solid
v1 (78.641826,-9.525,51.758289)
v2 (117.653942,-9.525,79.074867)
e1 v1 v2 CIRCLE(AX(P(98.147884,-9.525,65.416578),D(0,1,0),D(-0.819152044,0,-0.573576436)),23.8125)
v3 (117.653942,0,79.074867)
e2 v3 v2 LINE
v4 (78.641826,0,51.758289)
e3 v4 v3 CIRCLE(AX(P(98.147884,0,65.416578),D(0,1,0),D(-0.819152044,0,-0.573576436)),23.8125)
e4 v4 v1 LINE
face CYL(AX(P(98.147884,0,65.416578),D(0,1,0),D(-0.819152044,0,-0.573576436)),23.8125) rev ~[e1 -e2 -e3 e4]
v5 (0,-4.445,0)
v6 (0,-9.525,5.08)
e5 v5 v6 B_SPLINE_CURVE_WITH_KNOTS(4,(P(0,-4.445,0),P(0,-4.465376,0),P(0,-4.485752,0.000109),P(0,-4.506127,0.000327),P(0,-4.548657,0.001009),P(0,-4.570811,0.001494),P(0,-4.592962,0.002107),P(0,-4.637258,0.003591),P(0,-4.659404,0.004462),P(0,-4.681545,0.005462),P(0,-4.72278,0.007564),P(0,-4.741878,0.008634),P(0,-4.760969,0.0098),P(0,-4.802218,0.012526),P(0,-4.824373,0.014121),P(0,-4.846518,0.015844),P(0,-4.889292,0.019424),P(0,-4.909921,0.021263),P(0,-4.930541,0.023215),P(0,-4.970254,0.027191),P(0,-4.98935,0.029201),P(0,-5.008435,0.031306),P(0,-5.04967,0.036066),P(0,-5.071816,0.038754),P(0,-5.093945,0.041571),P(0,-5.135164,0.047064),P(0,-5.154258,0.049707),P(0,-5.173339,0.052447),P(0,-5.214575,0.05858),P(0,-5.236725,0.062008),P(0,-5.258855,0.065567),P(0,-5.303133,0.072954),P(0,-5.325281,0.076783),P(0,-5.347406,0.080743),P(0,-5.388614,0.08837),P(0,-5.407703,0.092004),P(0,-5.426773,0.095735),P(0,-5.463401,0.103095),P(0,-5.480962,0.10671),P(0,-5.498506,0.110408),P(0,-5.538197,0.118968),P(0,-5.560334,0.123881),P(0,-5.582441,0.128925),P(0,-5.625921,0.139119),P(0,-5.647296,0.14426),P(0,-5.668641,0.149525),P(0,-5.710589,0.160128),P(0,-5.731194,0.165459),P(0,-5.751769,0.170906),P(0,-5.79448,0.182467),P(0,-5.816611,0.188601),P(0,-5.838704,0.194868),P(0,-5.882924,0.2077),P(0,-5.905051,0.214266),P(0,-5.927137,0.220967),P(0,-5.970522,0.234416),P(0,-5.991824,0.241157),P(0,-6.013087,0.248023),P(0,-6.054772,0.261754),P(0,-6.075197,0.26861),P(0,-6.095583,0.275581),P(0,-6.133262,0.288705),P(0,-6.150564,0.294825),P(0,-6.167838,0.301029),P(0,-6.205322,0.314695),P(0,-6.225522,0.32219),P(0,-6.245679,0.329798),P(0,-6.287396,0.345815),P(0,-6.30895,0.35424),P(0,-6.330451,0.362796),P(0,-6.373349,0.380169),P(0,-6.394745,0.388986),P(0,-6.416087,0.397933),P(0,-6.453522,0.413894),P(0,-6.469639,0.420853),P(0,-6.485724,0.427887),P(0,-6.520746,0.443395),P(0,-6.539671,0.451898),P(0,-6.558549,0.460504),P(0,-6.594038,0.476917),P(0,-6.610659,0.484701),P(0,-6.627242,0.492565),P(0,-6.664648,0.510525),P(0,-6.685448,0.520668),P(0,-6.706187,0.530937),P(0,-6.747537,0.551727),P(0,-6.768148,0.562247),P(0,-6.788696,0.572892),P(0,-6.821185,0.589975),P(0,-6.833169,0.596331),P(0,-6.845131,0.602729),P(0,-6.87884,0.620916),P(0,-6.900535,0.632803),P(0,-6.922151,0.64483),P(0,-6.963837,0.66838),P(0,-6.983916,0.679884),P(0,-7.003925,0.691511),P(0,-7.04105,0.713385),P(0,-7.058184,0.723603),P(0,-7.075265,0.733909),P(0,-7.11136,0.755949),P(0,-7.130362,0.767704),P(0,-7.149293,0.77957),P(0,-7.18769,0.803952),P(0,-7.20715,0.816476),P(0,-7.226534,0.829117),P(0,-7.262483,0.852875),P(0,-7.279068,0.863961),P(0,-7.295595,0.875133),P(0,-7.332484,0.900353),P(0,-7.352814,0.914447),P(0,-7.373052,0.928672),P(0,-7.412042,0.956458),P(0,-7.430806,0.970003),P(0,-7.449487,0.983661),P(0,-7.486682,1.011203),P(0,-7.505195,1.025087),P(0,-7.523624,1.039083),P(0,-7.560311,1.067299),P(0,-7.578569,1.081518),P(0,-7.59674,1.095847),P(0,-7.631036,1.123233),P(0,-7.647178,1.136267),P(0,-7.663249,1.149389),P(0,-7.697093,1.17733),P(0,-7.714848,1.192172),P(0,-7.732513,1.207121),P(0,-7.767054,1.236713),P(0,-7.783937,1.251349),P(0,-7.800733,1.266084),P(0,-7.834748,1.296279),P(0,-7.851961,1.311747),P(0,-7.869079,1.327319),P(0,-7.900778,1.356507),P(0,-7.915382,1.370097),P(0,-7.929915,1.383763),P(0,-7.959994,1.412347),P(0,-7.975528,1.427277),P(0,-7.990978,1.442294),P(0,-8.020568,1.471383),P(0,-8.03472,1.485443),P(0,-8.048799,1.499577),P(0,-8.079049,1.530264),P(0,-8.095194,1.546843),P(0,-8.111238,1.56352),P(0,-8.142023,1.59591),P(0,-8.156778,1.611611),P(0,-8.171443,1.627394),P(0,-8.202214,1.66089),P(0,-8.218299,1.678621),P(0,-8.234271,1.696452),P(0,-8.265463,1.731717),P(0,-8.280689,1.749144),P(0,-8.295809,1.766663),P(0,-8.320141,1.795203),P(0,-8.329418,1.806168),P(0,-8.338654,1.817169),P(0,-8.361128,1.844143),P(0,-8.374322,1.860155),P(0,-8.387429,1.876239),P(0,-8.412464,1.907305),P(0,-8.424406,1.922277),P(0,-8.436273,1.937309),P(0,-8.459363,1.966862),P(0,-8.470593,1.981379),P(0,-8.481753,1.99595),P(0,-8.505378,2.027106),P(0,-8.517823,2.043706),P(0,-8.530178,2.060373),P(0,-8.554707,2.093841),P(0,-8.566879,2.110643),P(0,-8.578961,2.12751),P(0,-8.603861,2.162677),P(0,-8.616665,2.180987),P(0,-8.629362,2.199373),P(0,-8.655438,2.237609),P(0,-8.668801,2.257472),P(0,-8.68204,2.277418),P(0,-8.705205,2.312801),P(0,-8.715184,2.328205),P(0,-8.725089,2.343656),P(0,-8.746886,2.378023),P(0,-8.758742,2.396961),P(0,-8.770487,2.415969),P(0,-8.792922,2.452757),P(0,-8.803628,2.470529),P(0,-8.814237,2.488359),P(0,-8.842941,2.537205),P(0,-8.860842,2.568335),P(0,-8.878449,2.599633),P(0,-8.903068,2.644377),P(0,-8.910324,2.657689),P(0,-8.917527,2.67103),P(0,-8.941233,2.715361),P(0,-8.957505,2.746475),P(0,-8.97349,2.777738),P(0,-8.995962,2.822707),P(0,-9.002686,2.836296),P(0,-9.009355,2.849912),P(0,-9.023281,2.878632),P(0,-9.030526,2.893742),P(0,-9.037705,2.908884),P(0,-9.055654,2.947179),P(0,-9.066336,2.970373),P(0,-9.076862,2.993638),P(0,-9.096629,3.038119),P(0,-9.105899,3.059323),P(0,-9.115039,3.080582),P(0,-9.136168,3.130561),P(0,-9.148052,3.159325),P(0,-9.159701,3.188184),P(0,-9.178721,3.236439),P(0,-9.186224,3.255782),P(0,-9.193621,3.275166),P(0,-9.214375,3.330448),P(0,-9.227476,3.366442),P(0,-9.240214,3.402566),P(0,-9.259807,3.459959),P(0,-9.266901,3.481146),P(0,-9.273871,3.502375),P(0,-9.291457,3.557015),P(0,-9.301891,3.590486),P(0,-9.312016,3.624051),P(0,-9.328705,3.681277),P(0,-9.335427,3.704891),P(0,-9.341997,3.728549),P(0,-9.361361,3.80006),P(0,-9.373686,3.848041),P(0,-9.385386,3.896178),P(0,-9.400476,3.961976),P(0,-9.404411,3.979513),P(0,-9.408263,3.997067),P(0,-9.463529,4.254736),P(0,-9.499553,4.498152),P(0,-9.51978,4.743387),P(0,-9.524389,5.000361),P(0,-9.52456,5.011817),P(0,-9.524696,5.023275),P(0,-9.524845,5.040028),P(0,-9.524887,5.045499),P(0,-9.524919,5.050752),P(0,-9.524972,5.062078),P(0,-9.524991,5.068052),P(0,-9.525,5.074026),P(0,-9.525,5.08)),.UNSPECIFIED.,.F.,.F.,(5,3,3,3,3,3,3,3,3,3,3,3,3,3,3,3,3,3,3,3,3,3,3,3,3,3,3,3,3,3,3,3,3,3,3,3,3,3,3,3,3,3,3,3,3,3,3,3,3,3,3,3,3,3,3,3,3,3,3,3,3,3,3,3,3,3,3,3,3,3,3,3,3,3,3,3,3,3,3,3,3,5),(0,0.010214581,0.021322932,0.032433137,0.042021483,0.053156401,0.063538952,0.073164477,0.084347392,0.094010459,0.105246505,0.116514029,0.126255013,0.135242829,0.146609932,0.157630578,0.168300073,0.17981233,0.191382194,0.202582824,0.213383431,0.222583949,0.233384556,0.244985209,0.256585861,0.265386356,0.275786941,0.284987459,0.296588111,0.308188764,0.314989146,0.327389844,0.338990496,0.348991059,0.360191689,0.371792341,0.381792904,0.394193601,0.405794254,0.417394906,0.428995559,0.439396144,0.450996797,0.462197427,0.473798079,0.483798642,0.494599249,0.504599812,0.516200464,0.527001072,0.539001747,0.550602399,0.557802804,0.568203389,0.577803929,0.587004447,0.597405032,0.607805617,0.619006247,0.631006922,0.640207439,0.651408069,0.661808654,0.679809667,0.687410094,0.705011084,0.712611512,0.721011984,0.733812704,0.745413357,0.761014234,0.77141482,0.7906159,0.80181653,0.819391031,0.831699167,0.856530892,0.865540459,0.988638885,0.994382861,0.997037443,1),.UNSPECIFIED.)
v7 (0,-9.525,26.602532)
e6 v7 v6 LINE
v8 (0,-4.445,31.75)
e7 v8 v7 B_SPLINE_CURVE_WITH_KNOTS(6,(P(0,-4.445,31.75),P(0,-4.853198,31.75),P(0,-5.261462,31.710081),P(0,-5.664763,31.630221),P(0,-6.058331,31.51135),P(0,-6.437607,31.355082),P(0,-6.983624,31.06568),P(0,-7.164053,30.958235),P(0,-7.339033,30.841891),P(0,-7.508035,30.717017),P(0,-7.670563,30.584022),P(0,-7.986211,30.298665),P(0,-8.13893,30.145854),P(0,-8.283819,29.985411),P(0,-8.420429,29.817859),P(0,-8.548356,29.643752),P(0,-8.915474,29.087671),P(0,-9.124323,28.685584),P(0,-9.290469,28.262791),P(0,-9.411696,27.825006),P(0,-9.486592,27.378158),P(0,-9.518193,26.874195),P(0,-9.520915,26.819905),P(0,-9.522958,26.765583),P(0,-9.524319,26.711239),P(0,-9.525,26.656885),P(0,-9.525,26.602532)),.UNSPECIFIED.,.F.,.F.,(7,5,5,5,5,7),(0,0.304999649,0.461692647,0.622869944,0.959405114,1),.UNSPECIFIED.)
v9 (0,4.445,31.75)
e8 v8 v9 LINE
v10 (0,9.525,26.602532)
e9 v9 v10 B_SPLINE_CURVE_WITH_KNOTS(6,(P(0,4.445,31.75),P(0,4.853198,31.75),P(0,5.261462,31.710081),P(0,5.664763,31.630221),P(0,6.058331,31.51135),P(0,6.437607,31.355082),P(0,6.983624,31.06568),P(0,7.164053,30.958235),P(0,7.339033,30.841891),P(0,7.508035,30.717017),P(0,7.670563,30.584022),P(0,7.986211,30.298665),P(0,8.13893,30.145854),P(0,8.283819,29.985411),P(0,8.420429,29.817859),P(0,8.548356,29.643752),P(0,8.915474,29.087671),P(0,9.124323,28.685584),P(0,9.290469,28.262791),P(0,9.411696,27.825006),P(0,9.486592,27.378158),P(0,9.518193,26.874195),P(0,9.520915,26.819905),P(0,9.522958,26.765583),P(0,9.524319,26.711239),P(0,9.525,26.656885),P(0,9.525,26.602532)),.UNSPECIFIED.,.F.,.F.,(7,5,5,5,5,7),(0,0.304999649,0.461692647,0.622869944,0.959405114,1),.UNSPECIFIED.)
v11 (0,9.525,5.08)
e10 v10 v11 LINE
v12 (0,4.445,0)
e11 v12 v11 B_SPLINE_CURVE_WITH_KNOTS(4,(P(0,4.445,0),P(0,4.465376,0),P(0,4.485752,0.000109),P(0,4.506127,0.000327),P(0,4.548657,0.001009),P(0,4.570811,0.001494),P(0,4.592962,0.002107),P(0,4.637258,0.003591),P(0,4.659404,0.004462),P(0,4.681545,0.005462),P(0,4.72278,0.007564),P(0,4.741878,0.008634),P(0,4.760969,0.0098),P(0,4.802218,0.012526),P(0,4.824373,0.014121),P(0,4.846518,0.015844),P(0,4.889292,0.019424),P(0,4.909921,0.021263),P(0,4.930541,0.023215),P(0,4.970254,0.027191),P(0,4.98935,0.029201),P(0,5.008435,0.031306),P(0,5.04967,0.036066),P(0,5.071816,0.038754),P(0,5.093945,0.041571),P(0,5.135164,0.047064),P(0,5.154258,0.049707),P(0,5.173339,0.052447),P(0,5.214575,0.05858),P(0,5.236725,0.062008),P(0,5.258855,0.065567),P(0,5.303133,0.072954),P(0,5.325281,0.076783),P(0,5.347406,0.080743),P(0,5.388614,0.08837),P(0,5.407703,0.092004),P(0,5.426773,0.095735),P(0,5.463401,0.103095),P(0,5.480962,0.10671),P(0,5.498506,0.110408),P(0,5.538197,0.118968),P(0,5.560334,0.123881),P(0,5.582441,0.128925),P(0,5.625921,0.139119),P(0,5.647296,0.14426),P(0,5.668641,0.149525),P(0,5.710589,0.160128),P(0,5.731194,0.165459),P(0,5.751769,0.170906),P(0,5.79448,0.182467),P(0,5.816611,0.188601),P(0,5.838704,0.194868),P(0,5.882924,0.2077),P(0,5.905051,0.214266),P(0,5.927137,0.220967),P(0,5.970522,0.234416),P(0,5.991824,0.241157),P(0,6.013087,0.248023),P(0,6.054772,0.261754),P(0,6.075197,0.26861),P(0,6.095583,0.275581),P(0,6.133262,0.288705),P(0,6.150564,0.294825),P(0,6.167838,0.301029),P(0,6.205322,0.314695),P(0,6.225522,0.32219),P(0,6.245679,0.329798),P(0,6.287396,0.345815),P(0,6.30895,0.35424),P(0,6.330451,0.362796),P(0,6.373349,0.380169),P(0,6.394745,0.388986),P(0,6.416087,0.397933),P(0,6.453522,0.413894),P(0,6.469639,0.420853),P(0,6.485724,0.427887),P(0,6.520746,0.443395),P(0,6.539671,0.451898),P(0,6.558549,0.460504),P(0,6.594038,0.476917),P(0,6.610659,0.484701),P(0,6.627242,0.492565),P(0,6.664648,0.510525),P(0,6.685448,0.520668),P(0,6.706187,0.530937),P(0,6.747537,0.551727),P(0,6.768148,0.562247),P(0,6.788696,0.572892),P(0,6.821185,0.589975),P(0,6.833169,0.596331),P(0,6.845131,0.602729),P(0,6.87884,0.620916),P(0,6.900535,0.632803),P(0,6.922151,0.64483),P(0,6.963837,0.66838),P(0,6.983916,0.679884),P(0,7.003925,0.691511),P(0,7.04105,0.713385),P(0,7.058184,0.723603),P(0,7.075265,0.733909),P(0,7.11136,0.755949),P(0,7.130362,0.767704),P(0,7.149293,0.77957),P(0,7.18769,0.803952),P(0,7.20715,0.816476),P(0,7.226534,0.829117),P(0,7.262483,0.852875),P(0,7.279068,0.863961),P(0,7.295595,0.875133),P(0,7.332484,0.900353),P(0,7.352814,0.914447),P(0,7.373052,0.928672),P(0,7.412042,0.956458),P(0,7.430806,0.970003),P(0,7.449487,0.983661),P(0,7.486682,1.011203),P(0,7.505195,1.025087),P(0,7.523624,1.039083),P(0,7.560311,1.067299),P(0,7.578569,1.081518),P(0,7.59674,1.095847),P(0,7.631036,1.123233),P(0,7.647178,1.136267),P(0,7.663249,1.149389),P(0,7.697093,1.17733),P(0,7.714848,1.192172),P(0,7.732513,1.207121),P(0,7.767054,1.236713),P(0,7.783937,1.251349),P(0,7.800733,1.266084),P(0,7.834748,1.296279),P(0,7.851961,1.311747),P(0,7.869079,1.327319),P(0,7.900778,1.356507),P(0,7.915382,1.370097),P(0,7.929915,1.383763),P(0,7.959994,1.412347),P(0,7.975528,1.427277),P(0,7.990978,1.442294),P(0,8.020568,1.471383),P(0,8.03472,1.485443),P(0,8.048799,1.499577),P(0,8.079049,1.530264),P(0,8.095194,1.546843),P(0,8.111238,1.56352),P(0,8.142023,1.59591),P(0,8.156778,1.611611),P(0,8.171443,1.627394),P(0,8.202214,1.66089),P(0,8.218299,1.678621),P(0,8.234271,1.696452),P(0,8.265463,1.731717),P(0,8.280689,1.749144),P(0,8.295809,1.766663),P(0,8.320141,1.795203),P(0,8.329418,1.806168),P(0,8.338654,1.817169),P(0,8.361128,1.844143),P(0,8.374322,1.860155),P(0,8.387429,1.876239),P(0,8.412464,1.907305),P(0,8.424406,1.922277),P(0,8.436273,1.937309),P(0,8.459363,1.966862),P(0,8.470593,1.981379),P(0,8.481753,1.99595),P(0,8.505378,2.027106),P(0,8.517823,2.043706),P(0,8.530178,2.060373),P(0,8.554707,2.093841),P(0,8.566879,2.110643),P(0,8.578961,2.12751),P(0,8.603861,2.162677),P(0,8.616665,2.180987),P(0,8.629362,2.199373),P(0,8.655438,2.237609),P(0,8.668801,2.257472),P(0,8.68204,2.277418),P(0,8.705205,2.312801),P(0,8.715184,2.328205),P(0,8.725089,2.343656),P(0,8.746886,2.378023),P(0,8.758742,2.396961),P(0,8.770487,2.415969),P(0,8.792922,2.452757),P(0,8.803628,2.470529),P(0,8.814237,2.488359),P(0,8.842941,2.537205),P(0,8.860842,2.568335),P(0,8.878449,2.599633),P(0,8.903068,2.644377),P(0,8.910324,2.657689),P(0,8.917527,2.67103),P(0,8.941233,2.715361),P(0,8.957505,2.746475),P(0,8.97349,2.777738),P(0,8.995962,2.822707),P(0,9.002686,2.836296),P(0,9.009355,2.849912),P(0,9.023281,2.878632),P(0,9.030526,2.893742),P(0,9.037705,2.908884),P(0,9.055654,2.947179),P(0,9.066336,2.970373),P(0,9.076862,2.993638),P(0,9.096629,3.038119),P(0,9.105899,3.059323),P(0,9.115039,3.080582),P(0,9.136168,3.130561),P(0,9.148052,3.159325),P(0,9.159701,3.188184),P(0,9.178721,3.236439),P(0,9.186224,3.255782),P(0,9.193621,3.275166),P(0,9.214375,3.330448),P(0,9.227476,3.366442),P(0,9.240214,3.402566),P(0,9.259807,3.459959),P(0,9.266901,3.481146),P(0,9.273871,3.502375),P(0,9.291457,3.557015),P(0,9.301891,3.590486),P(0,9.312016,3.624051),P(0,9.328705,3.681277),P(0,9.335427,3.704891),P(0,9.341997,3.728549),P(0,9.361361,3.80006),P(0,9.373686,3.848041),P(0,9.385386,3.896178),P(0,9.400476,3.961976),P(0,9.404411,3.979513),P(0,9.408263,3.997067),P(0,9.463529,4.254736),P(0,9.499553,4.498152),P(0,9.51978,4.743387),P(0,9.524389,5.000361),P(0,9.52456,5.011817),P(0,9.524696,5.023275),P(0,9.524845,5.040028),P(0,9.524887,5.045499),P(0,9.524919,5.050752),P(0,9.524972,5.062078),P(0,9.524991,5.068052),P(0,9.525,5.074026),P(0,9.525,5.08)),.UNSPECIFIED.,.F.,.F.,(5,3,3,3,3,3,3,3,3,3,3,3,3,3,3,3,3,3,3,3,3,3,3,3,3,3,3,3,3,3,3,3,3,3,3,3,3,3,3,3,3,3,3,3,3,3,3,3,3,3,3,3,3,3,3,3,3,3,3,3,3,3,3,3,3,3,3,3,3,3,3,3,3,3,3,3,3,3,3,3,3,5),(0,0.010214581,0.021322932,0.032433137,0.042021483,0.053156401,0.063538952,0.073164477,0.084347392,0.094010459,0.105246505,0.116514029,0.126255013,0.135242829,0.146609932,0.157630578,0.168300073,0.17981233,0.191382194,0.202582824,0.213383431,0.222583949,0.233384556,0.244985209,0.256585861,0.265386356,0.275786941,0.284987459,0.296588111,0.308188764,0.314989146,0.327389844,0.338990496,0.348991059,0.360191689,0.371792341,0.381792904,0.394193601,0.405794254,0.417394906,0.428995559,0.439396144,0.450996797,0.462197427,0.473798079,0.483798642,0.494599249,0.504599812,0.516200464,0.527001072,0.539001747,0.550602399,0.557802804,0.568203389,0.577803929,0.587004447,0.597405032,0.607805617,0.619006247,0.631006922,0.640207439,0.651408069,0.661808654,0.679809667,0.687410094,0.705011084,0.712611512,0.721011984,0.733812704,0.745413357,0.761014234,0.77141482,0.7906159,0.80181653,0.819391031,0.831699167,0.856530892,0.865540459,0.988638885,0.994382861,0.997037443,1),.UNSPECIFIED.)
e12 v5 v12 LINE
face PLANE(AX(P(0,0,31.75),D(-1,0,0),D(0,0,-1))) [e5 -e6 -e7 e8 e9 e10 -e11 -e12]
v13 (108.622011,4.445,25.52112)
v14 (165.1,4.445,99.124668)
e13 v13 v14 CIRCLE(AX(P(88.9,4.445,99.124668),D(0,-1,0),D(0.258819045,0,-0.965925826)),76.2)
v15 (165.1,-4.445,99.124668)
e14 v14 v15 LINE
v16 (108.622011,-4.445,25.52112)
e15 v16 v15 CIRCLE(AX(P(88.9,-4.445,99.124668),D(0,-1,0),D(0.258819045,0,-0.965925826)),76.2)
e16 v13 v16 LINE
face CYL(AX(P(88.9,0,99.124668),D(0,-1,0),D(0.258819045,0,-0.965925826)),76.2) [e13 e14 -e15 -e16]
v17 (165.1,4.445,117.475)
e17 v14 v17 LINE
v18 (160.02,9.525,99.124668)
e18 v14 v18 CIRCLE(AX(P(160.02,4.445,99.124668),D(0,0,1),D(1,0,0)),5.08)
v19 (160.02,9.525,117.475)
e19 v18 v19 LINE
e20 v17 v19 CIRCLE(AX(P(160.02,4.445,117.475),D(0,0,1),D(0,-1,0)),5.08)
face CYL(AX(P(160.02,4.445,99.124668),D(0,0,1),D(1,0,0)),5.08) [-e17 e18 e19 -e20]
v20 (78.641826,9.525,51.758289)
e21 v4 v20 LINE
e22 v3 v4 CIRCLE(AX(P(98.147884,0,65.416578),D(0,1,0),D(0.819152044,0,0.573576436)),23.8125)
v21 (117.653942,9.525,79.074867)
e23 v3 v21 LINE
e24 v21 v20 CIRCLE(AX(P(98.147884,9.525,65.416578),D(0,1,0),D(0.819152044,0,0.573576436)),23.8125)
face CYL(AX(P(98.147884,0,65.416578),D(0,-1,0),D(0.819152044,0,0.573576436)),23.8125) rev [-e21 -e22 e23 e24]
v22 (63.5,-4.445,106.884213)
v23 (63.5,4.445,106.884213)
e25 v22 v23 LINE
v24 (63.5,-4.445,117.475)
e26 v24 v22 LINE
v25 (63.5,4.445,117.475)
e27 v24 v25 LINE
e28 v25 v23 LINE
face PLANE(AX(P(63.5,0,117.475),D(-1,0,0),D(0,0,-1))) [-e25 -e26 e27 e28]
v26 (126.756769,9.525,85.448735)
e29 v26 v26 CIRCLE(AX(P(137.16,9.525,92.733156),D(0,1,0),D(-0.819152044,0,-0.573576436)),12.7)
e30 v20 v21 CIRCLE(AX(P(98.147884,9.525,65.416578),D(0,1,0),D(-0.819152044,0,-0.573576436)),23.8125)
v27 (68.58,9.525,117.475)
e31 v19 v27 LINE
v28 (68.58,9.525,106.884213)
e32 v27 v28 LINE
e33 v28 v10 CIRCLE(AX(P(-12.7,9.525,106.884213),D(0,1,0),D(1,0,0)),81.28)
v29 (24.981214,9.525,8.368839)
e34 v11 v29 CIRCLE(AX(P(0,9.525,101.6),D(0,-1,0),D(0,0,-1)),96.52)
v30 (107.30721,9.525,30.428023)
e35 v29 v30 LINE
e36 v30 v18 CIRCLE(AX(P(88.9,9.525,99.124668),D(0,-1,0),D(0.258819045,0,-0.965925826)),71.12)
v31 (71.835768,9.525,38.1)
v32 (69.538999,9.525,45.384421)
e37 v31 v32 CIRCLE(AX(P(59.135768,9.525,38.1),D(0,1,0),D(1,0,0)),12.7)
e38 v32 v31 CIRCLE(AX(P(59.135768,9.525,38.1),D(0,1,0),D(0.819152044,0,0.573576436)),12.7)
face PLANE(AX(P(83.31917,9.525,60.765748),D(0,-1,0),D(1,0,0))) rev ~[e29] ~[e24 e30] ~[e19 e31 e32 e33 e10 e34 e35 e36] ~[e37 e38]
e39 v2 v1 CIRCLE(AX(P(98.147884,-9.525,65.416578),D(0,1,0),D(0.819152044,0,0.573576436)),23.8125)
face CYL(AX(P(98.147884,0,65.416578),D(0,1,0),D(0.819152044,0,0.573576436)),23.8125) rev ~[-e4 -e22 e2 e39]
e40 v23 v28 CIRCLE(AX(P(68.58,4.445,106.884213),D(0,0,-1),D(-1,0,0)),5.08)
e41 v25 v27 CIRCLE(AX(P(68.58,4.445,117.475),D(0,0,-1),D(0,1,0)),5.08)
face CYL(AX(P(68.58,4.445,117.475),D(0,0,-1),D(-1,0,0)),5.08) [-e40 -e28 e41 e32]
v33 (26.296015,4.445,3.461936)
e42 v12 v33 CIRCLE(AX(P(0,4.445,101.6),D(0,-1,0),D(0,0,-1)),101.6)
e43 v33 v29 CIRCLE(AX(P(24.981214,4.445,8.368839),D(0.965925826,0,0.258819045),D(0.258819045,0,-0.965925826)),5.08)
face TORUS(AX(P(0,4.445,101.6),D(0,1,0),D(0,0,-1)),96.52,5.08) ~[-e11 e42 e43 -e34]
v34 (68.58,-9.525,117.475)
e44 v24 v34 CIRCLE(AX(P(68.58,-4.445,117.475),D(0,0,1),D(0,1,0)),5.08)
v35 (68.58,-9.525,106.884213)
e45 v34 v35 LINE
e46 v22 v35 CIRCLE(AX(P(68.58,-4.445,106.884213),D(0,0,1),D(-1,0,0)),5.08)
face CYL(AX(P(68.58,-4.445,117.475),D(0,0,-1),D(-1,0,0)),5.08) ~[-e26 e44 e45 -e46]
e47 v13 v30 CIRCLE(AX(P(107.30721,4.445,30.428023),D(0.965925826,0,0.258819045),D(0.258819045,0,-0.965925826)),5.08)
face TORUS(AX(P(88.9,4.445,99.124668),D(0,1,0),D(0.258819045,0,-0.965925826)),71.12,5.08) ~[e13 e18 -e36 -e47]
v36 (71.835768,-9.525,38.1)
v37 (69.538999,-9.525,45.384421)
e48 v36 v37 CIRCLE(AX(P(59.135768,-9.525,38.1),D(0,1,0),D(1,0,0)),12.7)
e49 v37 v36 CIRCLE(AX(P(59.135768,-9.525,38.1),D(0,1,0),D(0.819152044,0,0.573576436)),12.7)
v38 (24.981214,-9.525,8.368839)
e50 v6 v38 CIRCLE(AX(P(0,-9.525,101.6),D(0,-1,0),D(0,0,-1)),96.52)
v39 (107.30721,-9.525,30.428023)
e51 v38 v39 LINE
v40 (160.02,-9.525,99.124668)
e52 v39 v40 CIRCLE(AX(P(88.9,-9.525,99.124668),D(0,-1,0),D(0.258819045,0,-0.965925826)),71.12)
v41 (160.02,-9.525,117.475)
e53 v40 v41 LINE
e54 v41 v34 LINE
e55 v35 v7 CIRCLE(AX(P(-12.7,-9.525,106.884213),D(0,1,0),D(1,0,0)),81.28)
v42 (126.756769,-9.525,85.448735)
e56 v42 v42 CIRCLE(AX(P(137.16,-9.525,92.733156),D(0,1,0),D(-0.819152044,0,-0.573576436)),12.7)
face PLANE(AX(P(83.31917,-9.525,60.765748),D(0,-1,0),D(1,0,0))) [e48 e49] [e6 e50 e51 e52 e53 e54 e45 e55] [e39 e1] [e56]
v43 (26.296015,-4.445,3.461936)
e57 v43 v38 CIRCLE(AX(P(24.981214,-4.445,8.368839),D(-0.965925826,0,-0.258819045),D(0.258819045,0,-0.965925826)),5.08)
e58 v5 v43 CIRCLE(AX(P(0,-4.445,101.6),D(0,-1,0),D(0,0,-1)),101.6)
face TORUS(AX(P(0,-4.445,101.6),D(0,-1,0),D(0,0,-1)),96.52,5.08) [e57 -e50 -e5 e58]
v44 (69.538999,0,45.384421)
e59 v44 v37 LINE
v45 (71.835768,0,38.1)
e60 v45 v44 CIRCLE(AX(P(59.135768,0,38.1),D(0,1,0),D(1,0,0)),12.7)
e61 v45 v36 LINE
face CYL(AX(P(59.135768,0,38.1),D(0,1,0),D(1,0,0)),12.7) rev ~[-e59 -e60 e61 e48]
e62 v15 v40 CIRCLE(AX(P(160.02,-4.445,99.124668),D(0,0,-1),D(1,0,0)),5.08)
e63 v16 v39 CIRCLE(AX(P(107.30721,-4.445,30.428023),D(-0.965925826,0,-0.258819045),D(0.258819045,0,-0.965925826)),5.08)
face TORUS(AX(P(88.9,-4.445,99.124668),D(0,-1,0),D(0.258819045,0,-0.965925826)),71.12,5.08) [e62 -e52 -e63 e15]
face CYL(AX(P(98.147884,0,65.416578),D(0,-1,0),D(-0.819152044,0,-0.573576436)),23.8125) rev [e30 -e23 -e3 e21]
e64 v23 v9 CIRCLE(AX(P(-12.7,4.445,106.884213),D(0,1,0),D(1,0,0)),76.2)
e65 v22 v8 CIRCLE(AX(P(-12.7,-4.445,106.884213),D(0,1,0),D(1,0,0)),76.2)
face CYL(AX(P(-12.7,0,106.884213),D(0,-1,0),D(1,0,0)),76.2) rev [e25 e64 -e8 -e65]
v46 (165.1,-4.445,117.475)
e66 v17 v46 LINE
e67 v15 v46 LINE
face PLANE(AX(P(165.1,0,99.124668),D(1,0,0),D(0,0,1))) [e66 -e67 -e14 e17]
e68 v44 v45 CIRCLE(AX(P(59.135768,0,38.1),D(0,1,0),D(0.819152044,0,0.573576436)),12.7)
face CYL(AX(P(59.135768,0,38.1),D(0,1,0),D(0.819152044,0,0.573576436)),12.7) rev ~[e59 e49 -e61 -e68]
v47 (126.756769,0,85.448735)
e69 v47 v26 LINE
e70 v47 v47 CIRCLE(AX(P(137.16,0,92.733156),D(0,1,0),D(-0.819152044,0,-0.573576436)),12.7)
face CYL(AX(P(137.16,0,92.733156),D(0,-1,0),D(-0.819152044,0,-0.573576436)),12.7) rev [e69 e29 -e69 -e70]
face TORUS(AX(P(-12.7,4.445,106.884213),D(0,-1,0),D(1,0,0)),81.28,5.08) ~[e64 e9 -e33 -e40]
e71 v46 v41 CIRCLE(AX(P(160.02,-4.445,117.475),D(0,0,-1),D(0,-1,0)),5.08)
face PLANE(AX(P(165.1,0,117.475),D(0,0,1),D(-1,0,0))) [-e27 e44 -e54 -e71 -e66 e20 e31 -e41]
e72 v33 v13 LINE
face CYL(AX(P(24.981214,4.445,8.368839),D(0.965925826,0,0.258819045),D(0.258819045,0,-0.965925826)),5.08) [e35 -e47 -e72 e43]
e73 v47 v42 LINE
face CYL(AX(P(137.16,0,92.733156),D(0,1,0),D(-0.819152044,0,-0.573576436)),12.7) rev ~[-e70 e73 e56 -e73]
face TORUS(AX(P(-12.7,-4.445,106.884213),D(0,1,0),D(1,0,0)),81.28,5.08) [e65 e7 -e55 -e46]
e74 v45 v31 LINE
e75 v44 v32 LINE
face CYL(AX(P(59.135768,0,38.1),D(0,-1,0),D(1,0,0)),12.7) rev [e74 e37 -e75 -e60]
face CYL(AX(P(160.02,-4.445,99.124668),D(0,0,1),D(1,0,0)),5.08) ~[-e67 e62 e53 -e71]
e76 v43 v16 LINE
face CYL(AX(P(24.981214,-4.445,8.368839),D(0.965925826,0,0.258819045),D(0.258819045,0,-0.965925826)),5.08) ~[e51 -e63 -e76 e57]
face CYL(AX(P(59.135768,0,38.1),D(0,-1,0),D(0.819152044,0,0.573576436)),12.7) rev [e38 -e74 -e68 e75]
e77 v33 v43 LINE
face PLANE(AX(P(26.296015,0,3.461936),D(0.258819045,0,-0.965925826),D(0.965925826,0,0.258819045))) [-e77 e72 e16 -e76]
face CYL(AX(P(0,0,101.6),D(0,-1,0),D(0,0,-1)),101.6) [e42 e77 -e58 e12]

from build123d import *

# Parameters (mm, degrees)
F1_DEPTH = 9.525
F2_R     = 5.08


# Not quite as in the source:
# - a feature names something its author has since deleted; it is built from what else it names


with BuildPart() as f1:
    # F0 (on Front) → F1 (new body, symmetric)
    with BuildSketch(Plane.XZ):
        with BuildLine():
            Line((0, 15.875), (0, 0))
            ThreePointArc((0, 0), (13.2614611296, 0.8692020844), (26.2960149824, 3.461936049))
            Line((26.2960149824, 3.461936049), (108.6220112368, 25.5211202615))
            ThreePointArc((108.6220112368, 25.5211202615), (149.3535245302, 52.7370473342), (165.1, 99.1246682247))
            Line((165.1, 99.1246682247), (165.1, 117.475))
            Line((165.1, 117.475), (63.5, 117.475))
            Line((63.5, 117.475), (63.5, 106.8842132454))
            ThreePointArc((63.5, 106.8842132454), (45.4987113259, 57.6973247485), (0, 31.75))
            Line((0, 31.75), (0, 15.875))
        make_face()
        with BuildLine():
            ThreePointArc((71.8357677815, 38.1), (47.023562507, 34.2810363463), (69.5389987439, 45.3844207417))
            ThreePointArc((69.5389987439, 45.3844207417), (71.247973056, 41.9189636537), (71.8357677815, 38.1))
        make_face(mode=Mode.SUBTRACT)
        with BuildLine():
            ThreePointArc((117.6539419454, 79.0748666718), (120.8582687804, 72.5771346319), (121.9603838907, 65.4165777812))
            ThreePointArc((121.9603838907, 65.4165777812), (105.3084407414, 42.7061928915), (78.6418258361, 51.7582888906))
            ThreePointArc((78.6418258361, 51.7582888906), (84.4895950001, 84.9226358359), (117.6539419454, 79.0748666718))
        make_face(mode=Mode.SUBTRACT)
        with BuildLine():
            ThreePointArc((149.86, 92.7331555624), (140.9789636537, 80.6209502879), (126.7567690375, 85.4487348208))
            ThreePointArc((126.7567690375, 85.4487348208), (133.3410363463, 104.8453608369), (149.86, 92.7331555624))
        make_face(mode=Mode.SUBTRACT)
    extrude(amount=F1_DEPTH, both=True)

    # F2
    f2_edges = [f1.edges().sort_by_distance(p)[0] for p in [
        (45.498711, -9.525, 57.697325),
        (63.5, -9.525, 112.179607),
        (63.5, 9.525, 112.179607),
        (165.1, -9.525, 108.299834),
        (149.353525, -9.525, 52.737047),
        (13.261461, 9.525, 0.869202),
    ]]
    fillet(f2_edges, radius=F2_R)


solid = f1.part
